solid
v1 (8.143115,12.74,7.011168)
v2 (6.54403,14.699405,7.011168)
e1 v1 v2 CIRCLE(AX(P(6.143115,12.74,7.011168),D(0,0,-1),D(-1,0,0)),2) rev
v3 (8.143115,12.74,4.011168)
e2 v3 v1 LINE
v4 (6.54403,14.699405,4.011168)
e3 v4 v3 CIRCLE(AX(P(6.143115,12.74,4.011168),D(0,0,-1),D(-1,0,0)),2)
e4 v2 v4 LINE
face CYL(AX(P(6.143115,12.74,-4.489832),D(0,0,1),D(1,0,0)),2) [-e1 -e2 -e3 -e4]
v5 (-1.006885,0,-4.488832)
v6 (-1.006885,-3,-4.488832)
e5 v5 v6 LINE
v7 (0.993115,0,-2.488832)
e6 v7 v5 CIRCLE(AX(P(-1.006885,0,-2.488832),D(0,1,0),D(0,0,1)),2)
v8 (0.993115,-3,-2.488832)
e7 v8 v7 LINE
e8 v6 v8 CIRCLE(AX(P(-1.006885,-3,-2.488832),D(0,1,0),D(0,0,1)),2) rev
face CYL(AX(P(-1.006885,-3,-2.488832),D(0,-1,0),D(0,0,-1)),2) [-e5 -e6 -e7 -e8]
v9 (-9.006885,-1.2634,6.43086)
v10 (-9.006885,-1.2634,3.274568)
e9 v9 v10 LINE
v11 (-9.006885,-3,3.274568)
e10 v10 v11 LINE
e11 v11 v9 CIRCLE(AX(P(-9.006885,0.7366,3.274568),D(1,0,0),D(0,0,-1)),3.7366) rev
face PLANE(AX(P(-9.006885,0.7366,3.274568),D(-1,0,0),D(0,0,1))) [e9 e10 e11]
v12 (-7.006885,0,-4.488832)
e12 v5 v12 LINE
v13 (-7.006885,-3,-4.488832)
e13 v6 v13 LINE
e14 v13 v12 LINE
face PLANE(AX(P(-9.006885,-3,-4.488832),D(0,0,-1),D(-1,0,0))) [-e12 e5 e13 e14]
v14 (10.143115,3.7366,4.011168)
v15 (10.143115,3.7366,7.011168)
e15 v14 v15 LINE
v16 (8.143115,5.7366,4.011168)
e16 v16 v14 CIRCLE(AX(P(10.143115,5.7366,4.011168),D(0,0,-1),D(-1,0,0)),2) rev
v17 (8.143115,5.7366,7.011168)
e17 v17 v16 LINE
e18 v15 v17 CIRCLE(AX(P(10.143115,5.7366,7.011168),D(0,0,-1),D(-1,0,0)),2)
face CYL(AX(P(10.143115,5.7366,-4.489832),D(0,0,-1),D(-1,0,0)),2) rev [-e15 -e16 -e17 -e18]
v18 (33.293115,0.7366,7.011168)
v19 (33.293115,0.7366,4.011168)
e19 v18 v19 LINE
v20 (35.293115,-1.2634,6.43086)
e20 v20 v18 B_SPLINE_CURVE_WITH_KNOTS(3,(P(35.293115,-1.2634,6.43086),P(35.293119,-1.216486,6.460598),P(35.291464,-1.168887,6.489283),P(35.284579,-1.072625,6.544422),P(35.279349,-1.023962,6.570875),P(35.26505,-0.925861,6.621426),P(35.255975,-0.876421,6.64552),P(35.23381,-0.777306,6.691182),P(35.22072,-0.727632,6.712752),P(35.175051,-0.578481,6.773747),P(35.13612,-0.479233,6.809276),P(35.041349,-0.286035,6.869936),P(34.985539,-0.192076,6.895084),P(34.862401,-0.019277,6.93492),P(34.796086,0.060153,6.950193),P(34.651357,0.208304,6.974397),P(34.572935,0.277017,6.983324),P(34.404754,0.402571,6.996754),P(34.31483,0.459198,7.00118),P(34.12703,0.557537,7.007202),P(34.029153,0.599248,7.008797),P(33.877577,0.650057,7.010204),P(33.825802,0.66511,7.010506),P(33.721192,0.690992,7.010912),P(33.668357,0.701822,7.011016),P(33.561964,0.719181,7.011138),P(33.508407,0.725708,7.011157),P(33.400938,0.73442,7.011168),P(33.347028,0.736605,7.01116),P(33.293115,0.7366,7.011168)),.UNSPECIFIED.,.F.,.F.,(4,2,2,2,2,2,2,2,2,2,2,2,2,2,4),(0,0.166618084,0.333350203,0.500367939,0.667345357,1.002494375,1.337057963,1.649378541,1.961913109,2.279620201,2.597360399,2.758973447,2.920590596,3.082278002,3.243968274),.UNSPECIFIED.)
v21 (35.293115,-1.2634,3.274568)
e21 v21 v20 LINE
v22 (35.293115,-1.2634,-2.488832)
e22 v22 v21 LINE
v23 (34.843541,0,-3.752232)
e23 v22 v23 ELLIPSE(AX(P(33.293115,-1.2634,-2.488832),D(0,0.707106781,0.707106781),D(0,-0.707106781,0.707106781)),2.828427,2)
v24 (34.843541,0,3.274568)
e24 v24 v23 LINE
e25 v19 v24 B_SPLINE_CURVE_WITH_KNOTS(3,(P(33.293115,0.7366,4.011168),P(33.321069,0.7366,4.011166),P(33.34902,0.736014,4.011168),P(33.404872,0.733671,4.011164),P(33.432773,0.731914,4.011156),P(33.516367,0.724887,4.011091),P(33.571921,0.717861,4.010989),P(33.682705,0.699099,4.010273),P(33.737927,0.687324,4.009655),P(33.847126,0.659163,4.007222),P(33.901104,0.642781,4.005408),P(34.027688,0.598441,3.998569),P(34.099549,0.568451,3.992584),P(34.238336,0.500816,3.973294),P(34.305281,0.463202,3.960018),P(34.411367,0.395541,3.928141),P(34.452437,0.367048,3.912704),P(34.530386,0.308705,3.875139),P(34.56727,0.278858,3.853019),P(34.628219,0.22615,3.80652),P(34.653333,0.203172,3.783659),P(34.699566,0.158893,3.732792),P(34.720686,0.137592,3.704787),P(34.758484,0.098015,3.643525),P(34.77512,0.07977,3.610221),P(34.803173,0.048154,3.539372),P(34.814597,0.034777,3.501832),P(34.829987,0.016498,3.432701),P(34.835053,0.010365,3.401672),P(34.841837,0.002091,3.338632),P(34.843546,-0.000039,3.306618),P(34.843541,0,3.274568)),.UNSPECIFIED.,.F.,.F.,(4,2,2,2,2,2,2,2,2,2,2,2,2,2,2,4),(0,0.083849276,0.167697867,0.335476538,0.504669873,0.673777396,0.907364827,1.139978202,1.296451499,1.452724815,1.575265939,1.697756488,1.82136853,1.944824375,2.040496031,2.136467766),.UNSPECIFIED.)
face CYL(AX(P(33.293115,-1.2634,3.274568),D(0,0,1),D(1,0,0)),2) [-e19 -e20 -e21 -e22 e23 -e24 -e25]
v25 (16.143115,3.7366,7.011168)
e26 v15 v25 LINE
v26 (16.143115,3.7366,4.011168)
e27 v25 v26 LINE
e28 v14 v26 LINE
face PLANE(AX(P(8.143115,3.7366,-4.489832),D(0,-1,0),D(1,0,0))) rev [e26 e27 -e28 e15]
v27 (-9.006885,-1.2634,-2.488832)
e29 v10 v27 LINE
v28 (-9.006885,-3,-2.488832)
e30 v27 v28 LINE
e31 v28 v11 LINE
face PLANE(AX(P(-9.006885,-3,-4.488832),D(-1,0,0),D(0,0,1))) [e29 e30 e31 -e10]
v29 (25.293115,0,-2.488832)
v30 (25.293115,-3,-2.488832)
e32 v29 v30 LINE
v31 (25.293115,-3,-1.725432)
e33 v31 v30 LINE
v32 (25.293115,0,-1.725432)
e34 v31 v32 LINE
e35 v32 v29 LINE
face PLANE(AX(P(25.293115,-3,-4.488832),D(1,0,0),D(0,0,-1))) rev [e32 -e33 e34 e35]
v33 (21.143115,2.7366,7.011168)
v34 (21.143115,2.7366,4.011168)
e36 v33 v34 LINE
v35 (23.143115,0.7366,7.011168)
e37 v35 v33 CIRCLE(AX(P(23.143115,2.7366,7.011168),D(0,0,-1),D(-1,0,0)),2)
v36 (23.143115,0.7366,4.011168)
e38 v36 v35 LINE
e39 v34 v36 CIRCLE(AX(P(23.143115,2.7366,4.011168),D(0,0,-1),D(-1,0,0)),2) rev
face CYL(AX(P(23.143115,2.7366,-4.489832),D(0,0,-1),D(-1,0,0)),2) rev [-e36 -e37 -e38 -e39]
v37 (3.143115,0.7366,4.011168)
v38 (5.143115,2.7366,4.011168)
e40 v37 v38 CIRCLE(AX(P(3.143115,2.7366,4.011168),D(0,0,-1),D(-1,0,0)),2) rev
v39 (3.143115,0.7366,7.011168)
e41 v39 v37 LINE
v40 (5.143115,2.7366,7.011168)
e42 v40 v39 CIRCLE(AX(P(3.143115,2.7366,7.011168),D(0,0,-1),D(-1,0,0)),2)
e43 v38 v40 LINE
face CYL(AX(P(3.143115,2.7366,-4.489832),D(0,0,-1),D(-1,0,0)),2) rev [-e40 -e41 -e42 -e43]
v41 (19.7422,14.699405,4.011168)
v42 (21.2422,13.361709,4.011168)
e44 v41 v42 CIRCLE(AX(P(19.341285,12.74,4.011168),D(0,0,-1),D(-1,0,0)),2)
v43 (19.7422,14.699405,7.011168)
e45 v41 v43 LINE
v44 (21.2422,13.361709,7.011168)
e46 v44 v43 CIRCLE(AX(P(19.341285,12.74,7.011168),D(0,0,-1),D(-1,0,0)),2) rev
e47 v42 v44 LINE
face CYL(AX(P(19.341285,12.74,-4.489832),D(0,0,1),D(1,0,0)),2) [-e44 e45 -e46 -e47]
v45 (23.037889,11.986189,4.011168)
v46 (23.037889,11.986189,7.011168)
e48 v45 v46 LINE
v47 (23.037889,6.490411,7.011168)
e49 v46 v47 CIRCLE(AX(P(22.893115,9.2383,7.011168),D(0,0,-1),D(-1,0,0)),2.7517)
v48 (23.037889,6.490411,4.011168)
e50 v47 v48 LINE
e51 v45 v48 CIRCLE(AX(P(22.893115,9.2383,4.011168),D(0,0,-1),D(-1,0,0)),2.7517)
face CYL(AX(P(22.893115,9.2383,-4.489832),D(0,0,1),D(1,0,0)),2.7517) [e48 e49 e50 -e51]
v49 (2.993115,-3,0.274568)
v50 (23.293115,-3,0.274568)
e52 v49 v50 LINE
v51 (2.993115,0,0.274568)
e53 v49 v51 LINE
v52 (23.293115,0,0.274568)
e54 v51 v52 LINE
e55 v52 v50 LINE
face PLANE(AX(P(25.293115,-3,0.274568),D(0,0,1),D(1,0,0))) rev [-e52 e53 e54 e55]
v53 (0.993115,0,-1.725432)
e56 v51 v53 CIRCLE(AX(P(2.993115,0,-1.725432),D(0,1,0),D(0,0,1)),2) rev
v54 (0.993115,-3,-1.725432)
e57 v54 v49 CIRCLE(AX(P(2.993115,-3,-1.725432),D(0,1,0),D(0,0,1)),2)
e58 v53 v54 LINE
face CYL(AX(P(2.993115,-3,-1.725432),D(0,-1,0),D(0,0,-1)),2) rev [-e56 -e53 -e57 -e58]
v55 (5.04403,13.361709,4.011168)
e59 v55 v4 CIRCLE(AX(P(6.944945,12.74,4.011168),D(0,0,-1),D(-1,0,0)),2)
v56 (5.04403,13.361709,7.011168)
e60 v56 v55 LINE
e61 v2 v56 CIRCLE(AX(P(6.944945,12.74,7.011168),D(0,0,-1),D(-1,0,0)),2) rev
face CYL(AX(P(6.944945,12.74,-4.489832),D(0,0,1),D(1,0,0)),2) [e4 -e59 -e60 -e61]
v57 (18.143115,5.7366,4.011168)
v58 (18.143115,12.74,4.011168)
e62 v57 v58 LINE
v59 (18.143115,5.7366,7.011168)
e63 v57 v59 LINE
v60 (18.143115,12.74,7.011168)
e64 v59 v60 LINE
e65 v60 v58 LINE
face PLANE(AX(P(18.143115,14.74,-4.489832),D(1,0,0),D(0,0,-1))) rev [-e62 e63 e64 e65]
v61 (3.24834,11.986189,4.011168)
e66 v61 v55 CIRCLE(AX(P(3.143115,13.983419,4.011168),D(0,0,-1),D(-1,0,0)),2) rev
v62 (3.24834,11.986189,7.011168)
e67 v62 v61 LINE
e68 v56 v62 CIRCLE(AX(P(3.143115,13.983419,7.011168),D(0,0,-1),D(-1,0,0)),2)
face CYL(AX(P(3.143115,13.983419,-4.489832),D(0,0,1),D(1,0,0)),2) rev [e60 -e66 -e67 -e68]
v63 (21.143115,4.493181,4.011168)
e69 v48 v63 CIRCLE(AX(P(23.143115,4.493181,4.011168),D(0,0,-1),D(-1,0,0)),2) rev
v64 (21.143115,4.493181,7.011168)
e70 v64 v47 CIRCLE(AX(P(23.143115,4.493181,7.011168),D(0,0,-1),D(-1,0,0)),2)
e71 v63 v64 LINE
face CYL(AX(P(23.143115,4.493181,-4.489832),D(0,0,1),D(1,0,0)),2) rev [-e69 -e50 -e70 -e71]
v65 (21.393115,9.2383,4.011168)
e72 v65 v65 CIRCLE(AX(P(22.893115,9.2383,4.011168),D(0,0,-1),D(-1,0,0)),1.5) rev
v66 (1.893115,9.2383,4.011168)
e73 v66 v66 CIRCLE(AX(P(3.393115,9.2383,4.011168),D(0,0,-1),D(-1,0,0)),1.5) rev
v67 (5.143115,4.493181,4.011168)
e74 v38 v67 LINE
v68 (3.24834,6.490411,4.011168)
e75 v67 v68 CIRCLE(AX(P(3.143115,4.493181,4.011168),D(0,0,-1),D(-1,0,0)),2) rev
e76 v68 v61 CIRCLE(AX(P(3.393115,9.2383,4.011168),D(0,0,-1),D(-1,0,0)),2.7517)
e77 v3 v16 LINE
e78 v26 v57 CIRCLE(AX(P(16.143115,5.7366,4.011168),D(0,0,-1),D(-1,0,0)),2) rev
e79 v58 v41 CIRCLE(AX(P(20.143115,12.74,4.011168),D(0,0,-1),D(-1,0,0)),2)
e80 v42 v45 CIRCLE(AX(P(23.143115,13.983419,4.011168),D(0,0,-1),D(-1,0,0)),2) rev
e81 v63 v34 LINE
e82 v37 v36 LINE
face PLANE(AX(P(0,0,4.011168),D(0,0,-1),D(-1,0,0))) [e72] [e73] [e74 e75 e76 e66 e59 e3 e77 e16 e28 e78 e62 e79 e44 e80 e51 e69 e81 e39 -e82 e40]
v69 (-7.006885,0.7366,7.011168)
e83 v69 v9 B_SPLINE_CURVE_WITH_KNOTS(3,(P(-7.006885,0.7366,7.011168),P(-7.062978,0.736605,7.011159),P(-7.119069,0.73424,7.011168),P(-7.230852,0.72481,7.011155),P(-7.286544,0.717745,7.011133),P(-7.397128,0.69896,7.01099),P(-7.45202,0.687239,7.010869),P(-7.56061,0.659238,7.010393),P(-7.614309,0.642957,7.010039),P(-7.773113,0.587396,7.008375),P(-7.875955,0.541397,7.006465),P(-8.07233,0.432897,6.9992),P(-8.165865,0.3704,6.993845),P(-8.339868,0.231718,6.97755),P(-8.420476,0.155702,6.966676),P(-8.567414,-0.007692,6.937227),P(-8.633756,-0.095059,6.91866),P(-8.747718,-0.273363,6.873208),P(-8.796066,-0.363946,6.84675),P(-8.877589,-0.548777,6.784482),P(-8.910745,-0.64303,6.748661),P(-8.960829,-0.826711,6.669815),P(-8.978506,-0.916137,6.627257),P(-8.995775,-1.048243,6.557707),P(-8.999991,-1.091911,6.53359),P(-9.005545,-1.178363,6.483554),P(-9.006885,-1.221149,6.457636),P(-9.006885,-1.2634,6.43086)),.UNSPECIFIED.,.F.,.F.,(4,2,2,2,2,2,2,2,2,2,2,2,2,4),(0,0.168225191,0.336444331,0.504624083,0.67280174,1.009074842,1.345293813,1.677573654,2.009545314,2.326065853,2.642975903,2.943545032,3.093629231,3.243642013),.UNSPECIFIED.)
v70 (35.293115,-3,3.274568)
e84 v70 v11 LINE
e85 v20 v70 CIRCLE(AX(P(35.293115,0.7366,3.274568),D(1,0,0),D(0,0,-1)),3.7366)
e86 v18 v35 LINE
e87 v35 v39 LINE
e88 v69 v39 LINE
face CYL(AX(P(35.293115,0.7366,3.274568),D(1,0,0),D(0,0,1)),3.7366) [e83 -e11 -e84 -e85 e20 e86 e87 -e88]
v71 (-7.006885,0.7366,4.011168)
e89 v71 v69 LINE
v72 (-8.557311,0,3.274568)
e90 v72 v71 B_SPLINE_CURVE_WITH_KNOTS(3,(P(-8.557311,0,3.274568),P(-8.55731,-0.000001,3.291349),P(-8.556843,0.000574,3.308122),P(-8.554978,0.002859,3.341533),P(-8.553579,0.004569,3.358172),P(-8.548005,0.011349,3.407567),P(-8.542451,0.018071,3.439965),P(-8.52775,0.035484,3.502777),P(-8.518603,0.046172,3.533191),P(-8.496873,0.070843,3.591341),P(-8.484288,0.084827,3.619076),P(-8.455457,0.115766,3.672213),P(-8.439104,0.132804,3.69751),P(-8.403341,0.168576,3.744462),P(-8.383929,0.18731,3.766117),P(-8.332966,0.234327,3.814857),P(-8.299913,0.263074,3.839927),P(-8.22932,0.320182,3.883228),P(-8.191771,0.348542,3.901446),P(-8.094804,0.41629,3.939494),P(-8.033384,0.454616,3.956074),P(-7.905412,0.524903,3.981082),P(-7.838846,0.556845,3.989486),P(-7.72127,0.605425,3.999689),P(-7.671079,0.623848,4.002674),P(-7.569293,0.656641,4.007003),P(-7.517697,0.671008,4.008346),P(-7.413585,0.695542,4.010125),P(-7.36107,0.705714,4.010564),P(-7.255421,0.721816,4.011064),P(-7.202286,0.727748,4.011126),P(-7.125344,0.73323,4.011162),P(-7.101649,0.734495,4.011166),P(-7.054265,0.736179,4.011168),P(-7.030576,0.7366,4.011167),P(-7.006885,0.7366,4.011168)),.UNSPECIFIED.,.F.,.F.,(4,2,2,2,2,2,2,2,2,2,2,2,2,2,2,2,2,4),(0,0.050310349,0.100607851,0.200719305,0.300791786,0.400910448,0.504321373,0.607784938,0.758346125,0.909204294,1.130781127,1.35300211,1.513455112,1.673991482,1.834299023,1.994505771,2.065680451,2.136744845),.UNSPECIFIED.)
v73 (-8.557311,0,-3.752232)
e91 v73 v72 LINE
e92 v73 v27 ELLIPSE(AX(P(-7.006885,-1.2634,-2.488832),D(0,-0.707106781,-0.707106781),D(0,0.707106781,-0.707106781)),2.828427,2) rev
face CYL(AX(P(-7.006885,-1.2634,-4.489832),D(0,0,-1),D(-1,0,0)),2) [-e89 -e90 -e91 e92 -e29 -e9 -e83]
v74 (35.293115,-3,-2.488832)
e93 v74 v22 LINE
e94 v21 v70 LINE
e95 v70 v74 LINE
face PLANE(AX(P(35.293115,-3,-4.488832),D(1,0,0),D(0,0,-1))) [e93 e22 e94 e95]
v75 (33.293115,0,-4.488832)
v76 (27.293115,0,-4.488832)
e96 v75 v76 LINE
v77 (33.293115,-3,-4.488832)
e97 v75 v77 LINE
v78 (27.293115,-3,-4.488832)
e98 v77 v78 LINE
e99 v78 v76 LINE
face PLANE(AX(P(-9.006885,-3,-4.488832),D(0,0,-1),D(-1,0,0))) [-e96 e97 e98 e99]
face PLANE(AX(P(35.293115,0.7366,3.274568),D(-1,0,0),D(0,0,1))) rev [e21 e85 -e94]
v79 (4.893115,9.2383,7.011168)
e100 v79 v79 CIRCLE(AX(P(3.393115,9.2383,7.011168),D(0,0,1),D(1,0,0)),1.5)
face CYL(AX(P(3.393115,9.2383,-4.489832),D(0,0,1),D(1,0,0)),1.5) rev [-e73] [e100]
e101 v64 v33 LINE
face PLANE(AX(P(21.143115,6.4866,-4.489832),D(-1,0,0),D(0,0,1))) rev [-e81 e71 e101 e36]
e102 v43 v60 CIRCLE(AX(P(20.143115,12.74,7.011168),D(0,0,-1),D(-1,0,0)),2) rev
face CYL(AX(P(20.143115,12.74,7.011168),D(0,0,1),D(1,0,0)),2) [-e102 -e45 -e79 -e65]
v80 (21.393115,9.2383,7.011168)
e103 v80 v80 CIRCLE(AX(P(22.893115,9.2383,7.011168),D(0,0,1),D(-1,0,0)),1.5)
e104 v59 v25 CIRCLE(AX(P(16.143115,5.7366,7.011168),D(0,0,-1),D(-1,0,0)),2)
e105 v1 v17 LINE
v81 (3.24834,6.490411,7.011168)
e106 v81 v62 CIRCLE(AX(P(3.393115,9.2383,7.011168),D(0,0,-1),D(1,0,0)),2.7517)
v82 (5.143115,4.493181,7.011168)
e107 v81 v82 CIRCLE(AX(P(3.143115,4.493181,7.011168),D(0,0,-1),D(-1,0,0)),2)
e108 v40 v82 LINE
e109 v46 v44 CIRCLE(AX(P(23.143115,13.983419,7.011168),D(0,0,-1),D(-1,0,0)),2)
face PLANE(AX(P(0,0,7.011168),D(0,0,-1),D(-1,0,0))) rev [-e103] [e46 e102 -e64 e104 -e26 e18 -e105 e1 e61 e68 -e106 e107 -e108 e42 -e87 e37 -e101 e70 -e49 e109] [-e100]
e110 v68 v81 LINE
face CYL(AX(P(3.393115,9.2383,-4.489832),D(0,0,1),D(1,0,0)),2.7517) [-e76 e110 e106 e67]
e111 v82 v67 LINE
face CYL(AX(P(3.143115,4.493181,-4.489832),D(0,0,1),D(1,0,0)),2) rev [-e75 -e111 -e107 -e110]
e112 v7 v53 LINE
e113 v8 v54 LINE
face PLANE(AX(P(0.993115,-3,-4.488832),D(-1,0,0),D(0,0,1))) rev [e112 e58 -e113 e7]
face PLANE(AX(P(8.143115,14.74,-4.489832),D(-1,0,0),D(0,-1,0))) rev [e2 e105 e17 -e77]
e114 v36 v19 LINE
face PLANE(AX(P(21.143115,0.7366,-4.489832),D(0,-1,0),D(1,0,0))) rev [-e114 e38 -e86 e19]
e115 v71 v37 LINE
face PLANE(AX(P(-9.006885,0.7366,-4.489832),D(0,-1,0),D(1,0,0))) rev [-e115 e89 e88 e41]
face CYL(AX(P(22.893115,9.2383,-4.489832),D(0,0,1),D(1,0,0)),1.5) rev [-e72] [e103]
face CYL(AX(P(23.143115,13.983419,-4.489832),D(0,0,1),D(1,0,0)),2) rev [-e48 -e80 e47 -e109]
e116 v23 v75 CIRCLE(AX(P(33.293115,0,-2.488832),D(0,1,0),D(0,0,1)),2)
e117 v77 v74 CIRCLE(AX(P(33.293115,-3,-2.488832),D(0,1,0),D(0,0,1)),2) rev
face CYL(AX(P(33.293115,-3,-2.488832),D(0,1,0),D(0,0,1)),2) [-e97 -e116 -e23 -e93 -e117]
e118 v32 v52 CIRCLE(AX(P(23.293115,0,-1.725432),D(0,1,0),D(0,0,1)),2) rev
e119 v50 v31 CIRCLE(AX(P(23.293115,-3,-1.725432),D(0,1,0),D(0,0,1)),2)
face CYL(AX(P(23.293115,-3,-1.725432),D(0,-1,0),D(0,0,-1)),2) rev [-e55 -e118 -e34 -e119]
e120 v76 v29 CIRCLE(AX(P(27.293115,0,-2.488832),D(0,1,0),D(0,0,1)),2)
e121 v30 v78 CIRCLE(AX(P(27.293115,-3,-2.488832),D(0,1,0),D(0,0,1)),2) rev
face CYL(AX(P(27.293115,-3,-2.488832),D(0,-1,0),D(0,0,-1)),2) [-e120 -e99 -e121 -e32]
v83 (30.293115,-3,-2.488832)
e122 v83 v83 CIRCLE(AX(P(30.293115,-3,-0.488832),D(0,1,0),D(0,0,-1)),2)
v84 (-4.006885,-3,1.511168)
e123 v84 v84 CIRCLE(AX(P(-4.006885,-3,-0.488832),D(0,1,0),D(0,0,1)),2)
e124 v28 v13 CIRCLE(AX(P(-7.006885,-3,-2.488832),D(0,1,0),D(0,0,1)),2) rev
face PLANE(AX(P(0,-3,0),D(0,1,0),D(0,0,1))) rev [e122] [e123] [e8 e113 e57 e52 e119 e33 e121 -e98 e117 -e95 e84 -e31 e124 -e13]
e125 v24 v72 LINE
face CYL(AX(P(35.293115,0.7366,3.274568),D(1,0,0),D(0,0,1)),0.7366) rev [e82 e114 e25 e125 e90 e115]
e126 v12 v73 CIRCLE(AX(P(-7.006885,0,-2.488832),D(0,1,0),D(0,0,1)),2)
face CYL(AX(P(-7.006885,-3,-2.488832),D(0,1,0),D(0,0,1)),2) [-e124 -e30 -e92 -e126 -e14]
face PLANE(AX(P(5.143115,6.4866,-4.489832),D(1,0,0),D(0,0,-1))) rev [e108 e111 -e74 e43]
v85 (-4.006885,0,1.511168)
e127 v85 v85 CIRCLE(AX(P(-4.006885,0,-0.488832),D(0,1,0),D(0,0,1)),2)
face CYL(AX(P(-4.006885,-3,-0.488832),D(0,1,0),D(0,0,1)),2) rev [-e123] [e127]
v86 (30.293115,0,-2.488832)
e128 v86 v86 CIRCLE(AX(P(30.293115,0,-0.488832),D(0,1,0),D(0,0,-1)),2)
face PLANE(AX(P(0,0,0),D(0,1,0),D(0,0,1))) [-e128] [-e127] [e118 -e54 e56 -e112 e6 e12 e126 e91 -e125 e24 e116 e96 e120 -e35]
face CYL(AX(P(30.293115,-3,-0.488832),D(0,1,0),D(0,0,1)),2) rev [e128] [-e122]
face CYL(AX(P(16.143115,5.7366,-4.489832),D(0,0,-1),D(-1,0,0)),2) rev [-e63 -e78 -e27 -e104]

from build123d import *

# Parameters (mm, degrees)
ESBO_O23_W                     = 44.3
ESBO_O23_H                     = 11.5
ESBO_O23_R                     = 2
FLANGE_BASE2_DEPTH             = 3
ARESTA_FLANGE1_STRIP_W         = 13.4732
ARESTA_FLANGE1_STRIP_H         = 3
ARESTA_FLANGE1_STRIP_CUT_DEPTH = 44.3
ARESTA_FLANGE1_DEPTH           = 44.3
CORTE_EXTRUS_O1_REACH          = 41.939
CORTE_EXTRUS_O2_REACH          = 41.939
ESBO_O33_R                     = 1.5
ESBO_O33_W                     = 10
ESBO_O33_H                     = 11.0034
FILETE1_START                  = -5
FILETE1_DEPTH                  = 12.011168151
FILETE1_START_2                = 4.011168151
FILETE1_2_DEPTH                = 3
FILETE1_3_DEPTH                = 3
FILETE1_START_3                = -4
FILETE1_4_DEPTH                = 4.7366001
ESBO_O34_W                     = 24.3
ESBO_O34_H                     = 4.7634
CORTE_EXTRUS_O3_DEPTH          = 39.884804768
FILETE2_R                      = 2


with BuildPart() as part:
    # Flange-base2: sheet metal written as solids
    # Esboço23 → Flange-base2 (new body)
    with BuildSketch(Plane(origin=(0, 0, 0), x_dir=(1, 0, 0), z_dir=(0, 1, 0))):
        with Locations((13.143114832, -1.261168151)):
            Rectangle(ESBO_O23_W, ESBO_O23_H)
        with Locations(Location((-4.006885168, 0.488831849, 0), (0, 0, 270))):
            Circle(ESBO_O23_R, mode=Mode.SUBTRACT)
        with Locations(Location((30.293114832, 0.488831849, 0), (0, 0, 90))):
            Circle(ESBO_O23_R, mode=Mode.SUBTRACT)
    extrude(amount=-FLANGE_BASE2_DEPTH)

    # Aresta-Flange1: sheet metal written as solids
    # Aresta-Flange1 strip (on a plane across the edge) → Aresta-Flange1 strip cut (cut)
    with BuildSketch(Plane(origin=(-9.006885168, 0, 7.011168151), x_dir=(0, 0, -1), z_dir=(1, 0, 0))):
        with Locations((-3, -1.5)):
            Rectangle(ARESTA_FLANGE1_STRIP_W, ARESTA_FLANGE1_STRIP_H)
    extrude(amount=ARESTA_FLANGE1_STRIP_CUT_DEPTH, mode=Mode.SUBTRACT)

    # Aresta-Flange1 section (on a plane across the edge) → Aresta-Flange1 (add)
    with BuildSketch(Plane(origin=(-9.006885168, 0, 7.011168151), x_dir=(0, 0, -1), z_dir=(1, 0, 0))):
        with BuildLine():
            Line((0, 0.7366), (0, 14.74))
            Line((0, 14.74), (3, 14.74))
            Line((3, 14.74), (3, 0.7366))
            ThreePointArc((3, 0.7366), (3.215745145, 0.215745145), (3.7366, 0))
            Line((3.7366, 0), (3.7366, -3))
            ThreePointArc((3.7366, -3), (1.094424801, -1.905575199), (0, 0.7366))
        make_face()
    extrude(amount=ARESTA_FLANGE1_DEPTH)

    # Esboço31 → Corte-extrusão1 (cut, up to next)
    with BuildSketch(Plane.XY.offset(7.011168151), mode=Mode.PRIVATE) as corte_extrus_o1_sk1:
        with BuildLine():
            Line((5.143114832, 14.74), (5.143114832, 11.99))
            Line((5.143114832, 11.99), (3.393114832, 11.99))
            ThreePointArc((3.393114832, 11.99), (0.641414832, 9.2383), (3.393114832, 6.4866))
            Line((3.393114832, 6.4866), (5.143114832, 6.4866))
            Line((5.143114832, 6.4866), (5.143114832, 0.7366))
            Line((5.143114832, 0.7366), (-9.006885168, 0.7366))
            Line((-9.006885168, 0.7366), (-9.006885168, 14.74))
            Line((-9.006885168, 14.74), (5.143114832, 14.74))
        make_face()
    corte_extrus_o1_tool1 = extrude(corte_extrus_o1_sk1.sketch, amount=-CORTE_EXTRUS_O1_REACH, mode=Mode.PRIVATE) & part.part
    # Esboço31 → Corte-extrusão1 (cut, up to next)
    with BuildSketch(Plane.XY.offset(7.011168151), mode=Mode.PRIVATE) as corte_extrus_o1_sk2:
        with BuildLine():
            Line((21.143114832, 6.4866), (21.143114832, 0.7366))
            Line((21.143114832, 0.7366), (35.293114832, 0.7366))
            Line((35.293114832, 0.7366), (35.293114832, 14.74))
            Line((35.293114832, 14.74), (21.143114832, 14.74))
            Line((21.143114832, 14.74), (21.143114832, 11.99))
            Line((21.143114832, 11.99), (22.893114832, 11.99))
            ThreePointArc((22.893114832, 11.99), (25.644814832, 9.2383), (22.893114832, 6.4866))
            Line((22.893114832, 6.4866), (21.143114832, 6.4866))
        make_face()
    corte_extrus_o1_tool2 = extrude(corte_extrus_o1_sk2.sketch, amount=-CORTE_EXTRUS_O1_REACH, mode=Mode.PRIVATE) & part.part
    add(corte_extrus_o1_tool1.solids().sort_by_distance((-2.549902, 7.555498, 7.011168))[0], mode=Mode.SUBTRACT)
    add(corte_extrus_o1_tool2.solids().sort_by_distance((28.836132, 7.555498, 7.011168))[0], mode=Mode.SUBTRACT)

    # Esboço33 → Corte-extrusão2 (cut, up to next)
    with BuildSketch(Plane.XY.offset(7.011168151), mode=Mode.PRIVATE) as corte_extrus_o2_sk1:
        with Locations((3.393114832, 9.2383)):
            Circle(ESBO_O33_R)
    corte_extrus_o2_tool1 = extrude(corte_extrus_o2_sk1.sketch, amount=-CORTE_EXTRUS_O2_REACH, mode=Mode.PRIVATE) & part.part
    # Esboço33 → Corte-extrusão2 (cut, up to next)
    with BuildSketch(Plane.XY.offset(7.011168151), mode=Mode.PRIVATE) as corte_extrus_o2_sk2:
        with Locations(Location((22.893114832, 9.2383, 0), (0, 0, 180))):
            Circle(ESBO_O33_R)
    corte_extrus_o2_tool2 = extrude(corte_extrus_o2_sk2.sketch, amount=-CORTE_EXTRUS_O2_REACH, mode=Mode.PRIVATE) & part.part
    # Esboço33 → Corte-extrusão2 (cut, up to next)
    with BuildSketch(Plane.XY.offset(7.011168151), mode=Mode.PRIVATE) as corte_extrus_o2_sk3:
        with Locations((13.143114832, 9.2383)):
            Rectangle(ESBO_O33_W, ESBO_O33_H)
    corte_extrus_o2_tool3 = extrude(corte_extrus_o2_sk3.sketch, amount=-CORTE_EXTRUS_O2_REACH, mode=Mode.PRIVATE) & part.part
    add(corte_extrus_o2_tool1.solids().sort_by_distance((3.393115, 9.2383, 7.011168))[0], mode=Mode.SUBTRACT)
    add(corte_extrus_o2_tool2.solids().sort_by_distance((22.893115, 9.2383, 7.011168))[0], mode=Mode.SUBTRACT)
    add(corte_extrus_o2_tool3.solids().sort_by_distance((13.143115, 9.2383, 7.011168))[0], mode=Mode.SUBTRACT)

    # Filete1: read off the stored shape, not the designer's step
    # Filete1 outline → Filete1 (cut)
    with BuildSketch(Plane.XY.offset(FILETE1_START)):
        with BuildLine():
            Line((-9.006885168, 0.7366), (-9.006885168, -1.2634))
            ThreePointArc((-9.006885168, -1.2634), (-8.42109873, 0.150813562), (-7.006885168, 0.7366))
            Line((-7.006885168, 0.7366), (-9.006885168, 0.7366))
        make_face()
        with BuildLine():
            ThreePointArc((33.293114832, 0.7366), (34.707328395, 0.150813562), (35.293114832, -1.2634))
            Line((35.293114832, -1.2634), (35.293114832, 0.7366))
            Line((35.293114832, 0.7366), (33.293114832, 0.7366))
        make_face()
    extrude(amount=FILETE1_DEPTH, mode=Mode.SUBTRACT)

    # Filete1 2 outline → Filete1 2 (add)
    with BuildSketch(Plane.XY.offset(FILETE1_START_2)):
        with BuildLine():
            ThreePointArc((5.143114832, 2.7366), (4.557328394, 1.322386438), (3.143114832, 0.7366))
            Line((3.143114832, 0.7366), (5.143114832, 0.7366))
            Line((5.143114832, 0.7366), (5.143114832, 2.7366))
        make_face()
        with BuildLine():
            Line((21.143114832, 0.7366), (23.143114832, 0.7366))
            ThreePointArc((23.143114832, 0.7366), (21.72890127, 1.322386438), (21.143114832, 2.7366))
            Line((21.143114832, 2.7366), (21.143114832, 0.7366))
        make_face()
        with BuildLine():
            Line((8.143114832, 3.7366), (10.143114832, 3.7366))
            ThreePointArc((10.143114832, 3.7366), (8.72890127, 4.322386438), (8.143114832, 5.7366))
            Line((8.143114832, 5.7366), (8.143114832, 3.7366))
        make_face()
        with BuildLine():
            ThreePointArc((18.143114832, 5.7366), (17.557328394, 4.322386437), (16.143114832, 3.7366))
            Line((16.143114832, 3.7366), (18.143114832, 3.7366))
            Line((18.143114832, 3.7366), (18.143114832, 5.7366))
        make_face()
    extrude(amount=FILETE1_2_DEPTH)

    # Filete1 3 outline → Filete1 3 (add)
    with BuildSketch(Plane.XY.offset(FILETE1_START_2)):
        with BuildLine():
            ThreePointArc((22.893114832, 11.99), (22.96552716, 11.989047052), (23.037889334, 11.986188868))
            ThreePointArc((23.037889334, 11.986188868), (21.69217531, 12.606910766), (21.143114832, 13.983418849))
            Line((21.143114832, 13.983418849), (21.143114832, 11.99))
            Line((21.143114832, 11.99), (22.893114832, 11.99))
        make_face()
        with BuildLine():
            ThreePointArc((21.143114832, 4.493181151), (21.69217531, 5.869689234), (23.037889334, 6.490411131))
            ThreePointArc((23.037889334, 6.490411131), (22.96552716, 6.487552948), (22.893114832, 6.4866))
            Line((22.893114832, 6.4866), (21.143114832, 6.4866))
            Line((21.143114832, 6.4866), (21.143114832, 4.493181151))
        make_face()
        with BuildLine():
            ThreePointArc((5.143114832, 13.983418849), (4.594054355, 12.606910766), (3.248340331, 11.986188869))
            ThreePointArc((3.248340331, 11.986188869), (3.320702504, 11.989047052), (3.393114832, 11.99))
            Line((3.393114832, 11.99), (5.143114832, 11.99))
            Line((5.143114832, 11.99), (5.143114832, 13.983418849))
        make_face()
        with BuildLine():
            ThreePointArc((3.248340331, 6.490411131), (4.594054355, 5.869689234), (5.143114832, 4.493181151))
            Line((5.143114832, 4.493181151), (5.143114832, 6.4866))
            Line((5.143114832, 6.4866), (3.393114832, 6.4866))
            ThreePointArc((3.393114832, 6.4866), (3.320702504, 6.487552948), (3.248340331, 6.490411131))
        make_face()
    extrude(amount=FILETE1_3_DEPTH)

    # Filete1 4 outline → Filete1 4 (cut)
    with BuildSketch(Plane(origin=(0, 0, 0), x_dir=(1, 0, 0), z_dir=(0, 1, 0)).offset(FILETE1_START_3)):
        with BuildLine():
            Line((35.293114832, 4.488831849), (33.293114832, 4.488831849))
            ThreePointArc((33.293114832, 4.488831849), (34.707328395, 3.903045412), (35.293114832, 2.488831849))
            Line((35.293114832, 2.488831849), (35.293114832, 4.488831849))
        make_face()
        with BuildLine():
            ThreePointArc((-9.006885168, 2.488831849), (-8.421098731, 3.903045412), (-7.006885168, 4.488831849))
            Line((-7.006885168, 4.488831849), (-9.006885168, 4.488831849))
            Line((-9.006885168, 4.488831849), (-9.006885168, 2.488831849))
        make_face()
    extrude(amount=FILETE1_4_DEPTH, mode=Mode.SUBTRACT)

    # Esboço34 → Corte-extrusão3 (cut, through all)
    with BuildSketch(Plane(origin=(0, 0, 0), x_dir=(1, 0, 0), z_dir=(0, 1, 0))):
        with Locations((13.143114832, 2.107131849)):
            Rectangle(ESBO_O34_W, ESBO_O34_H)
    extrude(amount=-CORTE_EXTRUS_O3_DEPTH, mode=Mode.SUBTRACT)

    # Filete2
    # the kernel refuses this fillet: 2 mm, written as the material it adds along each edge
    with BuildSketch(Plane(origin=(0.993114832, 0, 0.274568151), x_dir=(0, 0, -1), z_dir=(0, -1, 0))) as filete2_piece_1:
        with BuildLine():
            CenterArc((FILETE2_R, FILETE2_R), FILETE2_R, 180, 90)
            Line((0, FILETE2_R), (0, 0))
            Line((0, 0), (FILETE2_R, 0))
        make_face()
    extrude(amount=3)
    with BuildSketch(Plane(origin=(25.293114832, 0, 0.274568151), x_dir=(0, 0, -1), z_dir=(0, -1, 0))) as filete2_piece_2:
        with BuildLine():
            CenterArc((FILETE2_R, -FILETE2_R), FILETE2_R, 90, 90)
            Line((0, -FILETE2_R), (0, 0))
            Line((0, 0), (FILETE2_R, 0))
        make_face()
    extrude(amount=3)
    # the kernel refuses this fillet: 2 mm, written as the material it takes off along each edge
    with BuildSketch(Plane(origin=(5.143114832, 14.74, 11.515742565), x_dir=(1, 0, 0), z_dir=(0, 0, -1))) as filete2_2_piece_1:
        with BuildLine():
            CenterArc((1.801829766, 2), FILETE2_R, 198.110746947, 71.889253053)
            Line((-0.099085117, 1.378290576), (-0.289176606, 1.316119634))
            ThreePointArc((-0.289176606, 1.316119634), (-0.2, 0.756581151), (-0.2, 0))
            Line((-0.2, 0), (0, -0.2))
            Line((0, -0.2), (1.801829766, -0.2))
            Line((1.801829766, -0.2), (1.801829766, 0))
        make_face()
    extrude(amount=12.009148828, mode=Mode.SUBTRACT)
    with BuildSketch(Plane(origin=(21.143114832, 14.74, 11.515742565), x_dir=(0.07170480855584176, -0.9974258972124044, 0), z_dir=(0, 0, -1))) as filete2_2_piece_2:
        with BuildLine():
            CenterArc((1.865651936, 1.940601288), FILETE2_R, 184.111911668, 71.889253032)
            Line((-0.129199858, 1.797191671), (-0.328685038, 1.782850709))
            Line((-0.328685038, 1.782850709), (-0.199485179, -0.014340962))
            Line((-0.199485179, -0.014340962), (0.014340962, -0.199485179))
            ThreePointArc((0.014340962, -0.199485179), (0.768974595, -0.145234673), (1.333467159, -0.194060129))
            Line((1.333467159, -0.194060129), (1.381847593, 0))
        make_face()
    extrude(amount=12.009148828, mode=Mode.SUBTRACT)
    with BuildSketch(Plane(origin=(8.143114832, 14.74, 12.011168151), x_dir=(0, -1, 0), z_dir=(0, 0, -1)), Plane(origin=(18.143114832, 14.74, 12.011168151), x_dir=(1, 0, 0), z_dir=(0, 0, -1)), Plane(origin=(25.293114832, 5, -4.488831849), x_dir=(1, 0, 0), z_dir=(0, -1, 0))) as filete2_2_piece_3:
        with BuildLine():
            CenterArc((FILETE2_R, FILETE2_R), FILETE2_R, 180, 90)
            Line((0, FILETE2_R), (0, 0))
            Line((0, 0), (FILETE2_R, 0))
        make_face()
    extrude(amount=13, mode=Mode.SUBTRACT)
    with BuildSketch(Plane(origin=(0.993114832, 5, -4.488831849), x_dir=(-1, 0, 0), z_dir=(0, -1, 0))) as filete2_2_piece_4:
        with BuildLine():
            CenterArc((FILETE2_R, -FILETE2_R), FILETE2_R, 90, 90)
            Line((0, -FILETE2_R), (0, 0))
            Line((0, 0), (FILETE2_R, 0))
        make_face()
    extrude(amount=13, mode=Mode.SUBTRACT)


solid = part.part
